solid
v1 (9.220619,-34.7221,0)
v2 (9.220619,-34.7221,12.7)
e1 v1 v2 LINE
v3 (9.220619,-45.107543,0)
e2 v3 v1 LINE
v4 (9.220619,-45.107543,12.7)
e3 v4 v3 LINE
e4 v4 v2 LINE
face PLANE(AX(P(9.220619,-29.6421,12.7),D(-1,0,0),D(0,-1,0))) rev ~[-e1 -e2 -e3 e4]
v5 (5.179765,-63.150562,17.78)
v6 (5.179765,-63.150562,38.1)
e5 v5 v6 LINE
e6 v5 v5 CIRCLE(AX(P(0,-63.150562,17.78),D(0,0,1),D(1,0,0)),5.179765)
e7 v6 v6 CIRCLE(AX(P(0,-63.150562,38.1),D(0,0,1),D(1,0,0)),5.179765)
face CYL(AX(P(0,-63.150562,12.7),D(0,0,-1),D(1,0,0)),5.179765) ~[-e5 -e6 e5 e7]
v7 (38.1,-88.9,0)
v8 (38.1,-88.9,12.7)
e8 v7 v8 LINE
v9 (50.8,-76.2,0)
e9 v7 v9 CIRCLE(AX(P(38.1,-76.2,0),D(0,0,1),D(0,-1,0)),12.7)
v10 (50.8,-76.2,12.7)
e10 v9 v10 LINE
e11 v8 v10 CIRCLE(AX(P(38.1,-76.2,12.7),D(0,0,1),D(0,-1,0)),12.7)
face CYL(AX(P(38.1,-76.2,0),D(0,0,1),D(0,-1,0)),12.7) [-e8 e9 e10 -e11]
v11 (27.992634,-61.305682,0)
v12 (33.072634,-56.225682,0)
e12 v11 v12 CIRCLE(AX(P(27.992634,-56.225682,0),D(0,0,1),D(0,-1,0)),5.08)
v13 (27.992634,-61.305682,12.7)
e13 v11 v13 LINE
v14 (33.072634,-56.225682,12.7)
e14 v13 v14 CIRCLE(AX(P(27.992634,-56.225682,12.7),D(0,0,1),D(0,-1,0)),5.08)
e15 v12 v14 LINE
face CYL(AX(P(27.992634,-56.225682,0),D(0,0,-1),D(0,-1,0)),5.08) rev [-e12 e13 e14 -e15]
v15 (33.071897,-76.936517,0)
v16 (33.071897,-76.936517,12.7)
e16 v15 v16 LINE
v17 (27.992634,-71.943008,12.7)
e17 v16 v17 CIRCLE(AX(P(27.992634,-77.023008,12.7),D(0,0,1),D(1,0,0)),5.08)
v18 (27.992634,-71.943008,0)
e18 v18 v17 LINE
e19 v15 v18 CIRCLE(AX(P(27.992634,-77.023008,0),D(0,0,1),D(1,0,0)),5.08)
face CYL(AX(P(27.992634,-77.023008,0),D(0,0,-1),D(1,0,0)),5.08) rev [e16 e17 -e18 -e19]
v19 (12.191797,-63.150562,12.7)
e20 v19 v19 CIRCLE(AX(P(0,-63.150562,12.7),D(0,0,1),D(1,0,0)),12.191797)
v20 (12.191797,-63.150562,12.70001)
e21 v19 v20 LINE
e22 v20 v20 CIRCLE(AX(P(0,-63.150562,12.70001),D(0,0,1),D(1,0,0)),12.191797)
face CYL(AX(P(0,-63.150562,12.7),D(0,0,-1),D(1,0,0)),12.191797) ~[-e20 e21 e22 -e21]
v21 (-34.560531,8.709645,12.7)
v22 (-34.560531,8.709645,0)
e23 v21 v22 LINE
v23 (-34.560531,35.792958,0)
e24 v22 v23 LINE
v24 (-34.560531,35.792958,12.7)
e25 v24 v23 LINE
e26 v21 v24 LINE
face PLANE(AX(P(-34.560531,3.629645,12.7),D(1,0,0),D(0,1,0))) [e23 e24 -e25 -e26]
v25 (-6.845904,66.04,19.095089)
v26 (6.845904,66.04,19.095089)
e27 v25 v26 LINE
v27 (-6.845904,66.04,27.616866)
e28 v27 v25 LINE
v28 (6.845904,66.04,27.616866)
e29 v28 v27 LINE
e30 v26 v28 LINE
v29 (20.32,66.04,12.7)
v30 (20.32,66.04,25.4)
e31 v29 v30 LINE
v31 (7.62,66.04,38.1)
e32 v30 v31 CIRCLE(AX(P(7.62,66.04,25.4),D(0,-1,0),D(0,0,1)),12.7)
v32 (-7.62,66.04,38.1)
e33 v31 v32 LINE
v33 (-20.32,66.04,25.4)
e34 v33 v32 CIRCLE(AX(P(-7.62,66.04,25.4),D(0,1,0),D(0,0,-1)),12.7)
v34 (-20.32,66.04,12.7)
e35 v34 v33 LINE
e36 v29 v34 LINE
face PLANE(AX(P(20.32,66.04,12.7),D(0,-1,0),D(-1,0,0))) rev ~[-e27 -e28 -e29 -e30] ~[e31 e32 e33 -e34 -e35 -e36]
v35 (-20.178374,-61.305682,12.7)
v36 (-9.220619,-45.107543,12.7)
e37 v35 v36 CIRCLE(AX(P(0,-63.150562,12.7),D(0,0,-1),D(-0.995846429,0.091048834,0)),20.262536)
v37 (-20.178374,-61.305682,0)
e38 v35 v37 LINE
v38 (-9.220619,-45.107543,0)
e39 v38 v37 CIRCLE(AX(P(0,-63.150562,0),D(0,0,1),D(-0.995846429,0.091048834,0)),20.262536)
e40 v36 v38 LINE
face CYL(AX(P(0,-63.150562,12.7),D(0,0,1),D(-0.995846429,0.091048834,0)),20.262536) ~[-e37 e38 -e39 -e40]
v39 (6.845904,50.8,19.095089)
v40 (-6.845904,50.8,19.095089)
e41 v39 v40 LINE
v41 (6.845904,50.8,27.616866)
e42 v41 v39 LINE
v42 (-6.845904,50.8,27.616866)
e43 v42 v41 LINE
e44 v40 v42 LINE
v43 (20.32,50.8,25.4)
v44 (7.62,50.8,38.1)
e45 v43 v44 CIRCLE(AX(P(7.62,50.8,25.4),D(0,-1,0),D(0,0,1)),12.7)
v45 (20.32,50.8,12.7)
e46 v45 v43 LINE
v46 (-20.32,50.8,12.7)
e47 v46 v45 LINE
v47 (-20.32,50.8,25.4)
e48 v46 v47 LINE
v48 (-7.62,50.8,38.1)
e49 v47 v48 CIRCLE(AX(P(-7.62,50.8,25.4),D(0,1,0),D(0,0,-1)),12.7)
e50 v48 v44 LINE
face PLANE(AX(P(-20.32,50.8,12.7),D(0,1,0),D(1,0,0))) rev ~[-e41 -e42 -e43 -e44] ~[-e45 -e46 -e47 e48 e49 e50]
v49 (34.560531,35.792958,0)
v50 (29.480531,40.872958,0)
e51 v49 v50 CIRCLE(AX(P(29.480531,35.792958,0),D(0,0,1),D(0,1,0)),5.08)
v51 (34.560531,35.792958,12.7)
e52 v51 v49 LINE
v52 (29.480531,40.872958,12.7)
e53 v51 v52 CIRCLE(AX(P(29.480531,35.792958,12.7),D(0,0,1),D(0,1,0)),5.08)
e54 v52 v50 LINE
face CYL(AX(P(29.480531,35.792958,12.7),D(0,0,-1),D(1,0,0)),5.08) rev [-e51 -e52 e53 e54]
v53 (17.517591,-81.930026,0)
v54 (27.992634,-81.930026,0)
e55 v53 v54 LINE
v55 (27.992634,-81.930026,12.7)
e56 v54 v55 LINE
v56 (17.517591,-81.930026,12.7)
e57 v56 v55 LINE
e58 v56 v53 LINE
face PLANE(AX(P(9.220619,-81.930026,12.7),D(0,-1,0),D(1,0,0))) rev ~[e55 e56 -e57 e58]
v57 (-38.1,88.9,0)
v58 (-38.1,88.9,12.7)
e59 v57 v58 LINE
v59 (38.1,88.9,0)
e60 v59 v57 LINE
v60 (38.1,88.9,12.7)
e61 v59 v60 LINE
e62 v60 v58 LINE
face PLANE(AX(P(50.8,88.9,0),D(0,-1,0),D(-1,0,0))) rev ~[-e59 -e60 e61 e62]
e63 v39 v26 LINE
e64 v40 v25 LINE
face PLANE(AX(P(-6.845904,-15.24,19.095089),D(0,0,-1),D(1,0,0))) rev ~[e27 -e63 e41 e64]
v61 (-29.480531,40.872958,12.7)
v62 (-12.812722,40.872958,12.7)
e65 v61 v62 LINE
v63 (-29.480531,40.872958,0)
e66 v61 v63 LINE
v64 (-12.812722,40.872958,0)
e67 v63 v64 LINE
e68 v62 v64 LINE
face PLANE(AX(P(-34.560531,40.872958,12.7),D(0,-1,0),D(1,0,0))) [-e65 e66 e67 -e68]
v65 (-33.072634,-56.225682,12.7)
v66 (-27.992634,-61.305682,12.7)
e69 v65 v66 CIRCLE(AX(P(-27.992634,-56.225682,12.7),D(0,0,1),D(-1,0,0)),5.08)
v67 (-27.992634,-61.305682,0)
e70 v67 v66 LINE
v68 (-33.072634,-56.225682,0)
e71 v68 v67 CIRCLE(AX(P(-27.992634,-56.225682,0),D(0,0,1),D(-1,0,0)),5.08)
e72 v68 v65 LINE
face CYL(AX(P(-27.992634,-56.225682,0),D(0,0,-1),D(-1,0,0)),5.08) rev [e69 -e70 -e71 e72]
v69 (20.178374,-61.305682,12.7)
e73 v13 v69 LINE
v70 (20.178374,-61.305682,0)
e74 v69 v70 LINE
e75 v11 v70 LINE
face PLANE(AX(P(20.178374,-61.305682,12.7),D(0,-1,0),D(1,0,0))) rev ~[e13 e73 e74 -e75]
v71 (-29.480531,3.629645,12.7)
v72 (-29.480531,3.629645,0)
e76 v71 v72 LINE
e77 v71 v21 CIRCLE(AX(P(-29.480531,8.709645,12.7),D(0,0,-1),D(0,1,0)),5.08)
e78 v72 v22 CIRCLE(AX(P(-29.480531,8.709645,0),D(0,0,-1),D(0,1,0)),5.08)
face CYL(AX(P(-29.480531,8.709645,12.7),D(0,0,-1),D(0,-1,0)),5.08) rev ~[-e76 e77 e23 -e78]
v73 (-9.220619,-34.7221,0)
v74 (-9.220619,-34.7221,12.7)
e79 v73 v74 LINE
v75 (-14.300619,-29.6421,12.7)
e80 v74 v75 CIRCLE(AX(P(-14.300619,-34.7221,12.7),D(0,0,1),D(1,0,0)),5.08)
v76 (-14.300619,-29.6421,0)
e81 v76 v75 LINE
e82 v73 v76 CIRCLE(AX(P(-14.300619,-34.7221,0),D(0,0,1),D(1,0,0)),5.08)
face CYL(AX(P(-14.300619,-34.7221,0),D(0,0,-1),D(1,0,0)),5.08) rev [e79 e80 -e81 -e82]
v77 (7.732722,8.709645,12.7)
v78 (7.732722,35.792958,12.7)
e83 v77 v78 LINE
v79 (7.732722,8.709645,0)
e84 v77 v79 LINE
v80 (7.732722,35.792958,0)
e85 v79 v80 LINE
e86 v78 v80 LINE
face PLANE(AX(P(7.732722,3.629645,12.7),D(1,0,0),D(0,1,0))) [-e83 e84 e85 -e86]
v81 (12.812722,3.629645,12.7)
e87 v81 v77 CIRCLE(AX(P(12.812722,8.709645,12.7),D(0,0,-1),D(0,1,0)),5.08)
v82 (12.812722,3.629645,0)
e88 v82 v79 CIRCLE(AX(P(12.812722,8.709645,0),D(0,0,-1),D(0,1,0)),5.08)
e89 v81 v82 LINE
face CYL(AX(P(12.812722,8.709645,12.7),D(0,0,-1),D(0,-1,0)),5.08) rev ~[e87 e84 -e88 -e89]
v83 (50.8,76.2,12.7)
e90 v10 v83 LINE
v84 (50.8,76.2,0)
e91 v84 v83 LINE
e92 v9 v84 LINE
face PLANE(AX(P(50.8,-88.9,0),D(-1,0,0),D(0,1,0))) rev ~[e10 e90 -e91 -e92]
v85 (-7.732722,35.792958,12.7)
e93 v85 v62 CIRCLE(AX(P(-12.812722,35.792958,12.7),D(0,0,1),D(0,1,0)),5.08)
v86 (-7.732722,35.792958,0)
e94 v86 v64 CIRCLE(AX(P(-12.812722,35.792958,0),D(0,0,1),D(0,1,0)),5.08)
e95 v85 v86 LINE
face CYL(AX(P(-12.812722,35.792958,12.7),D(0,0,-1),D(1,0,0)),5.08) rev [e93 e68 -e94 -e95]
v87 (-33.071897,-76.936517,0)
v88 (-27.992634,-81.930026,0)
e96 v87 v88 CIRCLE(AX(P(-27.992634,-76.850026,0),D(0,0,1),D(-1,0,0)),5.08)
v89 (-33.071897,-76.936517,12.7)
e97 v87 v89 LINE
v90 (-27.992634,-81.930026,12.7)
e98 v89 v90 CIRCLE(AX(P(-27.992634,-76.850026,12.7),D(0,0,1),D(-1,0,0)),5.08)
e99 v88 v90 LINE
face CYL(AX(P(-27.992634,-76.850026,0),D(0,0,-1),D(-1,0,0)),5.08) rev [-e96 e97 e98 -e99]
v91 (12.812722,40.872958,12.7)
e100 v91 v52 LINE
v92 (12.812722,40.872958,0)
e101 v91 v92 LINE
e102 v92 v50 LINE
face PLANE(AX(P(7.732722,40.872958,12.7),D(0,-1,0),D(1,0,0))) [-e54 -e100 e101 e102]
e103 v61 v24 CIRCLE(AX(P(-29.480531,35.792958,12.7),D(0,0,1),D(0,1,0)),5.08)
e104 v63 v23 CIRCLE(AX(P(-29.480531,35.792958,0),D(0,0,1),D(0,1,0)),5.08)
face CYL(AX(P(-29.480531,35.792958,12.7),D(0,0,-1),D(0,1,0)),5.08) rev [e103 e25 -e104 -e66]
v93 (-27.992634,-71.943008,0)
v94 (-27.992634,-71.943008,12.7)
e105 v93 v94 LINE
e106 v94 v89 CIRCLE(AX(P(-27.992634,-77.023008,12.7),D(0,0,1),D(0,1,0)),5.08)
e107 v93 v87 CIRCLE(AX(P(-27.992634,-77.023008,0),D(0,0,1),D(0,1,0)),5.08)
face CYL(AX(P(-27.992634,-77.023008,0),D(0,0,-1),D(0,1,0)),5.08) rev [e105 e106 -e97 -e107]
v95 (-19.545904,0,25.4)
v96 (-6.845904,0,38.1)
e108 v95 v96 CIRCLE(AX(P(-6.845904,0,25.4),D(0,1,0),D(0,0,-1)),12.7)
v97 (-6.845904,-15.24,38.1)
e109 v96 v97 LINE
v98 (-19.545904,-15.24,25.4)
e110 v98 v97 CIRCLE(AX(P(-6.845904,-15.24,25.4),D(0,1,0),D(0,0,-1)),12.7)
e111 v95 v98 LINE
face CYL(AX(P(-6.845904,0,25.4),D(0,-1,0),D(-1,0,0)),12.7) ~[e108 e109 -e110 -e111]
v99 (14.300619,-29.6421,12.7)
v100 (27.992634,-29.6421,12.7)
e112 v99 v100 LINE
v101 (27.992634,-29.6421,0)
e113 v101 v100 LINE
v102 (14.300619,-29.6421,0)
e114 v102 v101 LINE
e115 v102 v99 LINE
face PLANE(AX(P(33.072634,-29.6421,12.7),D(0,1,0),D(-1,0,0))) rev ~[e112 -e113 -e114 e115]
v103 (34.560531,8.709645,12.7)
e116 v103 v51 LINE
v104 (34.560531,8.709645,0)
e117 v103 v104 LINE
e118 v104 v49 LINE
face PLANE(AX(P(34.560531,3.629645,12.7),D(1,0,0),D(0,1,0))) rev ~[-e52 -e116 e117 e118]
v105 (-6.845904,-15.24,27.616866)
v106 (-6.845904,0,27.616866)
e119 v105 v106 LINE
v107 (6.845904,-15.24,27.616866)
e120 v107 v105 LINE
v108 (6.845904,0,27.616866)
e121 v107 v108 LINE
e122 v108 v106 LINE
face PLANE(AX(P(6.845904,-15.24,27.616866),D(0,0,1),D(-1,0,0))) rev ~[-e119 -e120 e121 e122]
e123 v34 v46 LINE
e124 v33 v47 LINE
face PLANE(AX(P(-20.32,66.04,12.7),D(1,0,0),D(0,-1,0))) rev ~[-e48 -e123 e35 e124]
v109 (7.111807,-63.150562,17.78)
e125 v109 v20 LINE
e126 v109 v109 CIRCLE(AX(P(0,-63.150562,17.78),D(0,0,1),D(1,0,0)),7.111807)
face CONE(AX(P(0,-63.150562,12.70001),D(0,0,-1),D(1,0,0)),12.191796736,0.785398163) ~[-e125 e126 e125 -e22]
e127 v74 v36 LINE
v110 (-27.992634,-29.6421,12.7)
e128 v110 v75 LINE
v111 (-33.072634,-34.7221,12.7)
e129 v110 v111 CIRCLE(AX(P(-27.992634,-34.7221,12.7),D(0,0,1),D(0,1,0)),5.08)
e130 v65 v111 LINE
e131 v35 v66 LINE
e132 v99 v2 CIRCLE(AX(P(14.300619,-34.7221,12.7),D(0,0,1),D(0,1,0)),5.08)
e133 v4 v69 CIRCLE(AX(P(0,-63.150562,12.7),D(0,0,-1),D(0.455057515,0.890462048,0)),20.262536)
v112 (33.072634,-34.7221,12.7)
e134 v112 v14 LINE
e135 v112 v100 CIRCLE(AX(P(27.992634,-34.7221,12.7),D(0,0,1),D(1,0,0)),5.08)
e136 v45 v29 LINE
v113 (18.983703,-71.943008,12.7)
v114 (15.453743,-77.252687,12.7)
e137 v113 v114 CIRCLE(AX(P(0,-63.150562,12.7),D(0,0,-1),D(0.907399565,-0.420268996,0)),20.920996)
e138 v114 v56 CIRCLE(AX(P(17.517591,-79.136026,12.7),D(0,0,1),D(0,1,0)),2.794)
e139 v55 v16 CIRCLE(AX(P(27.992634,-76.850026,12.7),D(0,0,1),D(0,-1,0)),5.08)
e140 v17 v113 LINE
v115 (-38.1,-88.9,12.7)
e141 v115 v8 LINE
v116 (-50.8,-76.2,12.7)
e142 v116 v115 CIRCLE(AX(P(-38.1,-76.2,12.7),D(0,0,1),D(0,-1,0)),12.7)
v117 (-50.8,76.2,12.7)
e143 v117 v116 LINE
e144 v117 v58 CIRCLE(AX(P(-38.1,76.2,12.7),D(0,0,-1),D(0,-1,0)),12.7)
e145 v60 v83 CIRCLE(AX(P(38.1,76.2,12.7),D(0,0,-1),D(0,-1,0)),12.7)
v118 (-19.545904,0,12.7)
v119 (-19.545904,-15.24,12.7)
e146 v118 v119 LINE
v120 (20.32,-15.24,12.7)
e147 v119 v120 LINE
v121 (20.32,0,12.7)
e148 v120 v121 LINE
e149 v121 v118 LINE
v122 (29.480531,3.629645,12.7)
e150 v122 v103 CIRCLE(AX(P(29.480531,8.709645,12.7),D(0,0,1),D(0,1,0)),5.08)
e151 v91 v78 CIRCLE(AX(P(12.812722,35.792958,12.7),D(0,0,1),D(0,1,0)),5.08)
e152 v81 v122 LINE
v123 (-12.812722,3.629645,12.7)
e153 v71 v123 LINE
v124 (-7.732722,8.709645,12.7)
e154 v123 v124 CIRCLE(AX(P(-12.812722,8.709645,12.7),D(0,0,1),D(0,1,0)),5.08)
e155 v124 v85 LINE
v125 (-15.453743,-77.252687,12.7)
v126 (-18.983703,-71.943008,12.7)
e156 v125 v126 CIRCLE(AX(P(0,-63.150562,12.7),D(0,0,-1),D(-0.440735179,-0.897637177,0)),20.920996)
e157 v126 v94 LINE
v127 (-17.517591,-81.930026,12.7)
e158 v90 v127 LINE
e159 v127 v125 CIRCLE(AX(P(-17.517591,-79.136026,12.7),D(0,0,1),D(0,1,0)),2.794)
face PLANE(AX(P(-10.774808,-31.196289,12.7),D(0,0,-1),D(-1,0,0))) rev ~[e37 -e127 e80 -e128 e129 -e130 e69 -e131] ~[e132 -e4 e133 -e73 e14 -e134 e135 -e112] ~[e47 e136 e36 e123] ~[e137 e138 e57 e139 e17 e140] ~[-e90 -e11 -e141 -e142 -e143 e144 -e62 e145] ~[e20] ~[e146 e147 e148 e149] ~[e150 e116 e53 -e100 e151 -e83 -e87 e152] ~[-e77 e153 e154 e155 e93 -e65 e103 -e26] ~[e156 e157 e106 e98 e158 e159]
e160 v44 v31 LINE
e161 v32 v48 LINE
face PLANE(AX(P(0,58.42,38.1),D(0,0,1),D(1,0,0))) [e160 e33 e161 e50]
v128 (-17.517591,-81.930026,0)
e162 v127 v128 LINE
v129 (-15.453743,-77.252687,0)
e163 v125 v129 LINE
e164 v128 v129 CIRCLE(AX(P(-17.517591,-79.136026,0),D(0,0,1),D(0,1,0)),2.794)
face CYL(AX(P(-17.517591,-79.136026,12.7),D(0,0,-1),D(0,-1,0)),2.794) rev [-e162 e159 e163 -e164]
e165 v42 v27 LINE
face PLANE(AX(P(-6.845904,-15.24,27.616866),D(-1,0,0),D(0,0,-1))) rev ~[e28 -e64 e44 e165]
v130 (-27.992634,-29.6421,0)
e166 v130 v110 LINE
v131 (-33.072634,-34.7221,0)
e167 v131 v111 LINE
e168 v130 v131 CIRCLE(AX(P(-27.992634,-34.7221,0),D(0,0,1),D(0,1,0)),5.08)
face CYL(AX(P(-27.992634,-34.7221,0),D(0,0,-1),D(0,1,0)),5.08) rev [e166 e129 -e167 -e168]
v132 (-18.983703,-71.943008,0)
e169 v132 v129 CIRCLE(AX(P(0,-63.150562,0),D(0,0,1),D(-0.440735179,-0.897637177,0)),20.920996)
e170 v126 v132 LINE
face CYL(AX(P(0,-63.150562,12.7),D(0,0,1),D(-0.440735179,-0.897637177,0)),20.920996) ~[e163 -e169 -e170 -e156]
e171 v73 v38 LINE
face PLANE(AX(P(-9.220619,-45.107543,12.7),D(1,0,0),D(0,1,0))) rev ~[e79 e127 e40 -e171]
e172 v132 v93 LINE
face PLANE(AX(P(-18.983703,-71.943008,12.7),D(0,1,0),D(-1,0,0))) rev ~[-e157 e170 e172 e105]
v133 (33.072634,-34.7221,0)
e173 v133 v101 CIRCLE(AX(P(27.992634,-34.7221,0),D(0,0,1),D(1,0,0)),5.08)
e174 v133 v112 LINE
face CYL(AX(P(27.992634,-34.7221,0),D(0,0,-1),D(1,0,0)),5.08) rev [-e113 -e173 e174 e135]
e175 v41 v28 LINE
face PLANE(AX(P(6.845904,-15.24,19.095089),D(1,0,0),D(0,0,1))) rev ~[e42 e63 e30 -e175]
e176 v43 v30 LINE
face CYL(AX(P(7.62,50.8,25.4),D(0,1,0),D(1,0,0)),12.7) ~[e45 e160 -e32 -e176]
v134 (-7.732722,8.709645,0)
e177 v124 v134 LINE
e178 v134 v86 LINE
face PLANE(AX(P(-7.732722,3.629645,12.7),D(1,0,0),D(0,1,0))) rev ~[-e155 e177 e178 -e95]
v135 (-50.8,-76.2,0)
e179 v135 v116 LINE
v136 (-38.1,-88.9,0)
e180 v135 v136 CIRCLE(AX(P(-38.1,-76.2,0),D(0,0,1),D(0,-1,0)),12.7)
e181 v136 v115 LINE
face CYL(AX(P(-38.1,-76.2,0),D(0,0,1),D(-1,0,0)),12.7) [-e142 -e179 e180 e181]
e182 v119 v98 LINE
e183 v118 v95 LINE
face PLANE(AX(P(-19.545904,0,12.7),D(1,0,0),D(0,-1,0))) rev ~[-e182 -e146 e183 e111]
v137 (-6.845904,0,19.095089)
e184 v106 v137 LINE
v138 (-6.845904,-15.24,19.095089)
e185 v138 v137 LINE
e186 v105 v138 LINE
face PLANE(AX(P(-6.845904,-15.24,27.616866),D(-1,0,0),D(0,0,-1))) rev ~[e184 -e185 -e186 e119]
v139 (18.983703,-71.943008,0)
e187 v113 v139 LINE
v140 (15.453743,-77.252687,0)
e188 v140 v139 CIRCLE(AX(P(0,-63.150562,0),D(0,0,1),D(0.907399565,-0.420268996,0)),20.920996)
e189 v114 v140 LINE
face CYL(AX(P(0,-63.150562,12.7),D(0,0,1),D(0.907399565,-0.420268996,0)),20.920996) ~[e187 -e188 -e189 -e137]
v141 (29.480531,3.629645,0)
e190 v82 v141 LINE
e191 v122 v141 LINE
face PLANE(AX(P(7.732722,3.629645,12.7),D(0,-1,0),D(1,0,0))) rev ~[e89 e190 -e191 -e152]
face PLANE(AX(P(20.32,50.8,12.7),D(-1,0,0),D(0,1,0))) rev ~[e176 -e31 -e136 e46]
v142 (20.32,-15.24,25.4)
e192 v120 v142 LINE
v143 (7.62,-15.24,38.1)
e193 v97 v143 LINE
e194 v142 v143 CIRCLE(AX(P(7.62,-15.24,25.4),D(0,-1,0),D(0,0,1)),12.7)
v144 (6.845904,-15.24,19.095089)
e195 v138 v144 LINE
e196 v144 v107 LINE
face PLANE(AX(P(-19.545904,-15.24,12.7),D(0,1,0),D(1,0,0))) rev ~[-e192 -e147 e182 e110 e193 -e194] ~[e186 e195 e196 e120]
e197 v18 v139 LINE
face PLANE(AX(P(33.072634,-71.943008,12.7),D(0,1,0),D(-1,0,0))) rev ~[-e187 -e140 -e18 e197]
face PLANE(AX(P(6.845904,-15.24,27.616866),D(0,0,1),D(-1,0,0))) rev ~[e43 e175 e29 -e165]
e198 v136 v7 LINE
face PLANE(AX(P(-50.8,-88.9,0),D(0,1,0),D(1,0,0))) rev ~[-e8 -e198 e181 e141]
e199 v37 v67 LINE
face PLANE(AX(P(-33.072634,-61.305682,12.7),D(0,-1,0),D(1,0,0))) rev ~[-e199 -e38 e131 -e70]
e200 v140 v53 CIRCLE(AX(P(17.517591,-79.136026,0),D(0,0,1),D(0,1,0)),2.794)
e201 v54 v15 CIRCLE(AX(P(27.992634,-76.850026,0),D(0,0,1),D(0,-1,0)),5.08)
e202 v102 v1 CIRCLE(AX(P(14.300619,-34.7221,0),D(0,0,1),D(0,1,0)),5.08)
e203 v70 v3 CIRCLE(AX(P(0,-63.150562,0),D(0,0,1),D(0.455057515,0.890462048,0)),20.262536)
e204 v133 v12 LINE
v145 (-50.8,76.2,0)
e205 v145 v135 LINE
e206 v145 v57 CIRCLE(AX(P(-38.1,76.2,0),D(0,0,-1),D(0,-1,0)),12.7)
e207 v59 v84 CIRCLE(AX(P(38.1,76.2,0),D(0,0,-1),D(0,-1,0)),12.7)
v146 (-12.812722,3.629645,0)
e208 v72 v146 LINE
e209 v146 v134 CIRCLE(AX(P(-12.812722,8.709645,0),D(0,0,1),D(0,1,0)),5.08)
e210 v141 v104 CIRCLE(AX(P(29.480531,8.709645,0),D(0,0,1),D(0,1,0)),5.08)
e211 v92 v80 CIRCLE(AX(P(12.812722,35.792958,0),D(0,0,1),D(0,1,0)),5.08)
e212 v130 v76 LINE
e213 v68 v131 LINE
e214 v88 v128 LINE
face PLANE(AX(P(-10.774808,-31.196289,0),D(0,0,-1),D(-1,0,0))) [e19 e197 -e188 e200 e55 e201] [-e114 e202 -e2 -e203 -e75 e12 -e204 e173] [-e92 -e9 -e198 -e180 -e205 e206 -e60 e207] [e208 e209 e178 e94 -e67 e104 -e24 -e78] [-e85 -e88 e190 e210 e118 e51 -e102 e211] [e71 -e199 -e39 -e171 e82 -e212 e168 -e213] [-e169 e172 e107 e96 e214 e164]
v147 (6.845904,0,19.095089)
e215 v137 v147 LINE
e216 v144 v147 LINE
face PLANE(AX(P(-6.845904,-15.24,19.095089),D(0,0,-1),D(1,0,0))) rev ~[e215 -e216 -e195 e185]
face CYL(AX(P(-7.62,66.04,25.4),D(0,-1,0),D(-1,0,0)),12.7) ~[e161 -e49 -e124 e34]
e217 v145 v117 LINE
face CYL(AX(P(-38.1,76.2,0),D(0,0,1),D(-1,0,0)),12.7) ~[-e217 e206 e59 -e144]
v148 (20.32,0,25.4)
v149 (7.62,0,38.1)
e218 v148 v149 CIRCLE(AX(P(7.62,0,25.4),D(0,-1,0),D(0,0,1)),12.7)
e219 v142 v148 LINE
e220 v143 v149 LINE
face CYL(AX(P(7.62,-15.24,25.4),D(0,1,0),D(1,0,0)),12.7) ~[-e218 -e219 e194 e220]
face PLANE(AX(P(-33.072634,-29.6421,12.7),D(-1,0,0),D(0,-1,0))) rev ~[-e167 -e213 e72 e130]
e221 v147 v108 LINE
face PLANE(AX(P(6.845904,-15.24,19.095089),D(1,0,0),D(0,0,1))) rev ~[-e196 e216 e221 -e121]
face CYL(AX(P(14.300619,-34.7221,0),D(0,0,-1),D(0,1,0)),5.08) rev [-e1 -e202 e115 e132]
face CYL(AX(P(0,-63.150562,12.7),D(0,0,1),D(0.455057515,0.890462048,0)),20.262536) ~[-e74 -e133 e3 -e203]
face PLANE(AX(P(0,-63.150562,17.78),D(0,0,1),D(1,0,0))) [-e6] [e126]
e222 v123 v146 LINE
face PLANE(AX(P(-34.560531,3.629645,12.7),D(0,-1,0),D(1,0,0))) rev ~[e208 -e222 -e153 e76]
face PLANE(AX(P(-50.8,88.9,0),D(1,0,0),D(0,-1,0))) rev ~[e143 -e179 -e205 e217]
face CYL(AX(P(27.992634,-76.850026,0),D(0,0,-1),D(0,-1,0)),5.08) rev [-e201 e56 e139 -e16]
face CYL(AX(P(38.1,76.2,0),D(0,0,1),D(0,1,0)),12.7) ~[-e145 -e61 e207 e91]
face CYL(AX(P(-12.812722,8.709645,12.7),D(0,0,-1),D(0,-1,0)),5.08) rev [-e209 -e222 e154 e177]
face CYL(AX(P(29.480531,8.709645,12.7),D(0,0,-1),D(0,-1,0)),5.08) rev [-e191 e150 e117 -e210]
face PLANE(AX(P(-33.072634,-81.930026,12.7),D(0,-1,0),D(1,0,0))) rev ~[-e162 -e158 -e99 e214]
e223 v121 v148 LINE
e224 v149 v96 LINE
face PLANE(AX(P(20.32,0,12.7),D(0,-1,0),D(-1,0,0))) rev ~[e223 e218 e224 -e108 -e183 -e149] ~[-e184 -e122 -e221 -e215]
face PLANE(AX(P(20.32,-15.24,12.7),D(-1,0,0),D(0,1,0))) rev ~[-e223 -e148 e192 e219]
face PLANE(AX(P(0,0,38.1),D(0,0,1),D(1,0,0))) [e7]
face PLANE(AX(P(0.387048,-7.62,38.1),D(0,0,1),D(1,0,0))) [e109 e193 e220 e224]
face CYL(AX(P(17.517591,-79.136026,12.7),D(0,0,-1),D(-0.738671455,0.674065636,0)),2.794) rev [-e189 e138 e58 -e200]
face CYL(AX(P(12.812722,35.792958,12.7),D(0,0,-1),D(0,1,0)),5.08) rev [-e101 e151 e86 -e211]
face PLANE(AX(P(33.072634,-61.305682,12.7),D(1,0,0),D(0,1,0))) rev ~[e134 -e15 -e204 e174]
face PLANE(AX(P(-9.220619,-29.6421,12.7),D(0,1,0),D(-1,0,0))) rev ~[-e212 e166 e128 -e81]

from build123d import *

# Parameters (mm, degrees)
F1_DEPTH     = 12.7
F3_DEPTH     = 25.4
F4_R         = 12.7
F5_R         = 12.7
F6_R         = 12.7
F8_DEPTH     = 104.141
F9_W         = 26.8278098665
F9_H         = 37.2433126904
F10_DEPTH    = 12.701
F11_R        = 5.08
F12_R        = 12.1917967362
F12_R_2      = 5.1797647995
F13_DEPTH    = 5.08
F14_DEPTH    = 25.4
F15_SIZE     = 5.07999
F17_DEPTH    = 25.4
F18_R        = 5.08
F19_DEPTH    = 12.701
F21_DEPTH    = 12.701
F22_T1_DEPTH = 12.7
F23_R        = 2.794


# Not quite as in the source:
# - a fillet or chamfer that OpenCascade refuses, or shapes differently, is made with other operations: its cross-section is extruded or revolved along the edge and cut away or added
# - a fillet or chamfer is up to 0.001 mm smaller than in the source, because OpenCascade refuses the exact size
# - a feature names something its author has since deleted; it is built from what else it names


with BuildPart() as f1:
    # F0 (on Top) → F1 (new body)
    with BuildSketch(Plane.XY):
        Polygon((-50.8, 88.9), (-50.8, 0), (-50.8, -88.9), (0, -88.9), (50.8, -88.9), (50.8, 0), (50.8, 88.9), (0, 88.9), align=None)
    extrude(amount=F1_DEPTH)

    # F2 (on face) → F3 (join)
    with BuildSketch(Plane.XY.offset(12.7)):
        Polygon((20.32, 66.04), (0, 66.04), (-20.32, 66.04), (-20.32, 50.8), (0, 50.8), (20.32, 50.8), align=None)
        Polygon((0, 0), (-19.5459036618, 0), (-19.5459036618, -15.24), (0, -15.24), (20.32, -15.24), (20.32, 0), align=None)
    extrude(amount=F3_DEPTH)

    # F4
    f4_edges = [f1.edges().sort_by_distance(p)[0] for p in [
        (20.32, -7.62, 38.1),
        (-19.545904, -7.62, 38.1),
    ]]
    fillet(f4_edges, radius=F4_R)

    # F5
    f5_edges = [f1.edges().sort_by_distance(p)[0] for p in [
        (20.32, 58.42, 38.1),
        (-20.32, 58.42, 38.1),
    ]]
    fillet(f5_edges, radius=F5_R)

    # F6
    f6_edges = [f1.edges().sort_by_distance(p)[0] for p in [
        (50.8, 88.9, 6.35),
        (-50.8, 88.9, 6.35),
        (50.8, -88.9, 6.35),
        (-50.8, -88.9, 6.35),
    ]]
    fillet(f6_edges, radius=F6_R)

    # F7 (on face) → F8 (cut, through all)
    with BuildSketch(Plane.XZ.offset(15.24)):
        Polygon((6.8459036618, 27.6168659329), (0, 27.6168659329), (-6.8459036618, 27.6168659329), (-6.8459036618, 19.0950892866), (0, 19.0950892866), (6.8459036618, 19.0950892866), align=None)
    extrude(amount=-F8_DEPTH, mode=Mode.SUBTRACT)

    # F9 (on face) → F10 (cut, through all)
    with BuildSketch(Plane.XY.offset(12.7)):
        with Locations((-21.1466264445, 22.2513012122)):
            Rectangle(F9_W, F9_H)
        with Locations((21.1466264445, 22.2513012122)):
            Rectangle(F9_W, F9_H)
    extrude(amount=-F10_DEPTH, mode=Mode.SUBTRACT)

    # F11
    f11_edges = [f1.edges().sort_by_distance(p)[0] for p in [
        (-34.560531, 40.872958, 6.35),
        (-7.732722, 40.872958, 6.35),
        (-7.732722, 3.629645, 6.35),
        (-34.560531, 3.629645, 6.35),
        (34.560531, 3.629645, 6.35),
        (7.732722, 3.629645, 6.35),
        (7.732722, 40.872958, 6.35),
        (34.560531, 40.872958, 6.35),
    ]]
    fillet(f11_edges, radius=F11_R)

    # F12 (on face) → F13 (join)
    with BuildSketch(Plane.XY.offset(12.7)):
        with Locations((0, -63.150562346)):
            Circle(F12_R)
        with Locations((0, -63.150562346)):
            Circle(F12_R_2, mode=Mode.SUBTRACT)
    extrude(amount=F13_DEPTH)

    # F14 (add): a face of the model
    f14_faces = [f1.faces().sort_by_distance(p)[0] for p in [
        (0, -63.150562346, 12.7),
    ]]
    extrude(f14_faces, amount=F14_DEPTH)

    # F15 (size 5.08 in the source; OpenCascade refuses exactly that, so slightly less here)
    f15_edges = [f1.edges().sort_by_distance(p)[0] for p in [
        (-12.191797, -63.150562, 17.78),
    ]]
    chamfer(f15_edges, length=F15_SIZE)

    # F16 (on face) → F17 (cut)
    with BuildSketch(Plane.XY.offset(12.7)):
        with BuildLine():
            Line((-9.2206190628, -29.6420995146), (-33.0726338262, -29.6420995146))
            Line((-33.0726338262, -29.6420995146), (-33.0726338262, -61.3056821097))
            Line((-33.0726338262, -61.3056821097), (-20.1783736468, -61.3056821097))
            ThreePointArc((-20.1783736468, -61.3056821097), (-16.7830306246, -51.7971386698), (-9.2206190628, -45.1075434685))
            Line((-9.2206190628, -45.1075434685), (-9.2206190628, -29.6420995146))
        make_face()
        with BuildLine():
            Line((33.0726338262, -29.6420995146), (9.2206190628, -29.6420995146))
            Line((9.2206190628, -29.6420995146), (9.2206190628, -45.1075434685))
            ThreePointArc((9.2206190628, -45.1075434685), (16.7830306246, -51.7971386698), (20.1783736468, -61.3056821097))
            Line((20.1783736468, -61.3056821097), (33.0726338262, -61.3056821097))
            Line((33.0726338262, -61.3056821097), (33.0726338262, -29.6420995146))
        make_face()
    extrude(amount=-F17_DEPTH, mode=Mode.SUBTRACT)

    # F18
    f18_edges = [f1.edges().sort_by_distance(p)[0] for p in [
        (-9.220619, -29.6421, 6.35),
        (-33.072634, -29.6421, 6.35),
        (-33.072634, -61.305682, 6.35),
        (33.072634, -61.305682, 6.35),
        (33.072634, -29.6421, 6.35),
        (9.220619, -29.6421, 6.35),
    ]]
    fillet(f18_edges, radius=F18_R)

    # F16 (on face) → F19 (cut, through all)
    with BuildSketch(Plane.XY.offset(12.7)):
        with BuildLine():
            Line((-9.2206190628, -29.6420995146), (-33.0726338262, -29.6420995146))
            Line((-33.0726338262, -29.6420995146), (-33.0726338262, -61.3056821097))
            Line((-33.0726338262, -61.3056821097), (-20.1783736468, -61.3056821097))
            ThreePointArc((-20.1783736468, -61.3056821097), (-16.7830306246, -51.7971386698), (-9.2206190628, -45.1075434685))
            Line((-9.2206190628, -45.1075434685), (-9.2206190628, -29.6420995146))
        make_face()
        with BuildLine():
            Line((33.0726338262, -29.6420995146), (9.2206190628, -29.6420995146))
            Line((9.2206190628, -29.6420995146), (9.2206190628, -45.1075434685))
            ThreePointArc((9.2206190628, -45.1075434685), (16.7830306246, -51.7971386698), (20.1783736468, -61.3056821097))
            Line((20.1783736468, -61.3056821097), (33.0726338262, -61.3056821097))
            Line((33.0726338262, -61.3056821097), (33.0726338262, -29.6420995146))
        make_face()
    extrude(amount=-F19_DEPTH, mode=Mode.SUBTRACT)

    # F20 (on face) → F21 (cut, through all)
    with BuildSketch(Plane.XY.offset(12.7)):
        with BuildLine():
            Line((-33.0726338262, -81.930026412), (-9.2206190628, -81.930026412))
            ThreePointArc((-9.2206190628, -81.930026412), (-14.9601496341, -77.7752677938), (-18.9837029569, -71.9430084535))
            Line((-18.9837029569, -71.9430084535), (-33.0726338262, -71.9430084535))
            Line((-33.0726338262, -71.9430084535), (-33.0726338262, -81.930026412))
        make_face()
        with BuildLine():
            ThreePointArc((18.9837029569, -71.9430084535), (14.9601496341, -77.7752677938), (9.2206190628, -81.930026412))
            Line((9.2206190628, -81.930026412), (33.0726338262, -81.930026412))
            Line((33.0726338262, -81.930026412), (33.0726338262, -71.9430084535))
            Line((33.0726338262, -71.9430084535), (18.9837029569, -71.9430084535))
        make_face()
    extrude(amount=-F21_DEPTH, mode=Mode.SUBTRACT)

    # F22: fillet of radius 5.08 on 10 edges, made by hand

    # F22_s2 → F22_t1 (join)
    with BuildSketch(Plane.XY):
        with BuildLine():
            ThreePointArc((-9.2206190628, -34.7220995146), (-10.7085166144, -31.1299970662), (-14.3006190628, -29.6420995146))
            Line((-14.3006190628, -29.6420995146), (-9.2206190628, -29.6420995146))
            Line((-9.2206190628, -29.6420995146), (-9.2206190628, -34.7220995146))
        make_face()
        with BuildLine():
            ThreePointArc((-27.9926338262, -29.6420995146), (-31.5847362746, -31.1299970662), (-33.0726338262, -34.7220995146))
            Line((-33.0726338262, -34.7220995146), (-33.0726338262, -29.6420995146))
            Line((-33.0726338262, -29.6420995146), (-27.9926338262, -29.6420995146))
        make_face()
        with BuildLine():
            ThreePointArc((-33.0726338262, -56.2256821097), (-31.5847362746, -59.8177845582), (-27.9926338262, -61.3056821097))
            Line((-27.9926338262, -61.3056821097), (-33.0726338262, -61.3056821097))
            Line((-33.0726338262, -61.3056821097), (-33.0726338262, -56.2256821097))
        make_face()
        with BuildLine():
            ThreePointArc((33.0726338262, -34.7220995146), (31.5847362746, -31.1299970662), (27.9926338262, -29.6420995146))
            Line((27.9926338262, -29.6420995146), (33.0726338262, -29.6420995146))
            Line((33.0726338262, -29.6420995146), (33.0726338262, -34.7220995146))
        make_face()
        with BuildLine():
            ThreePointArc((14.3006190628, -29.6420995146), (10.7085166144, -31.1299970662), (9.2206190628, -34.7220995146))
            Line((9.2206190628, -34.7220995146), (9.2206190628, -29.6420995146))
            Line((9.2206190628, -29.6420995146), (14.3006190628, -29.6420995146))
        make_face()
        with BuildLine():
            ThreePointArc((27.9926338262, -61.3056821097), (31.5847362746, -59.8177845582), (33.0726338262, -56.2256821097))
            Line((33.0726338262, -56.2256821097), (33.0726338262, -61.3056821097))
            Line((33.0726338262, -61.3056821097), (27.9926338262, -61.3056821097))
        make_face()
        with BuildLine():
            ThreePointArc((-33.0726338262, -76.850026412), (-31.5847362746, -80.4421288604), (-27.9926338262, -81.930026412))
            Line((-27.9926338262, -81.930026412), (-33.0726338262, -81.930026412))
            Line((-33.0726338262, -81.930026412), (-33.0726338262, -76.850026412))
        make_face()
        with BuildLine():
            ThreePointArc((-27.9926338262, -71.9430084535), (-31.5847362746, -73.4309060051), (-33.0726338262, -77.0230084535))
            Line((-33.0726338262, -77.0230084535), (-33.0726338262, -71.9430084535))
            Line((-33.0726338262, -71.9430084535), (-27.9926338262, -71.9430084535))
        make_face()
        with BuildLine():
            ThreePointArc((33.0726338262, -77.0230084535), (31.5847362746, -73.4309060051), (27.9926338262, -71.9430084535))
            Line((27.9926338262, -71.9430084535), (33.0726338262, -71.9430084535))
            Line((33.0726338262, -71.9430084535), (33.0726338262, -77.0230084535))
        make_face()
        with BuildLine():
            ThreePointArc((27.9926338262, -81.930026412), (31.5847362746, -80.4421288604), (33.0726338262, -76.850026412))
            Line((33.0726338262, -76.850026412), (33.0726338262, -81.930026412))
            Line((33.0726338262, -81.930026412), (27.9926338262, -81.930026412))
        make_face()
    extrude(amount=F22_T1_DEPTH)

    # F23
    f23_edges = [f1.edges().sort_by_distance(p)[0] for p in [
        (9.220619, -81.930026, 6.35),
        (-9.220619, -81.930026, 6.35),
    ]]
    fillet(f23_edges, radius=F23_R)


solid = f1.part
